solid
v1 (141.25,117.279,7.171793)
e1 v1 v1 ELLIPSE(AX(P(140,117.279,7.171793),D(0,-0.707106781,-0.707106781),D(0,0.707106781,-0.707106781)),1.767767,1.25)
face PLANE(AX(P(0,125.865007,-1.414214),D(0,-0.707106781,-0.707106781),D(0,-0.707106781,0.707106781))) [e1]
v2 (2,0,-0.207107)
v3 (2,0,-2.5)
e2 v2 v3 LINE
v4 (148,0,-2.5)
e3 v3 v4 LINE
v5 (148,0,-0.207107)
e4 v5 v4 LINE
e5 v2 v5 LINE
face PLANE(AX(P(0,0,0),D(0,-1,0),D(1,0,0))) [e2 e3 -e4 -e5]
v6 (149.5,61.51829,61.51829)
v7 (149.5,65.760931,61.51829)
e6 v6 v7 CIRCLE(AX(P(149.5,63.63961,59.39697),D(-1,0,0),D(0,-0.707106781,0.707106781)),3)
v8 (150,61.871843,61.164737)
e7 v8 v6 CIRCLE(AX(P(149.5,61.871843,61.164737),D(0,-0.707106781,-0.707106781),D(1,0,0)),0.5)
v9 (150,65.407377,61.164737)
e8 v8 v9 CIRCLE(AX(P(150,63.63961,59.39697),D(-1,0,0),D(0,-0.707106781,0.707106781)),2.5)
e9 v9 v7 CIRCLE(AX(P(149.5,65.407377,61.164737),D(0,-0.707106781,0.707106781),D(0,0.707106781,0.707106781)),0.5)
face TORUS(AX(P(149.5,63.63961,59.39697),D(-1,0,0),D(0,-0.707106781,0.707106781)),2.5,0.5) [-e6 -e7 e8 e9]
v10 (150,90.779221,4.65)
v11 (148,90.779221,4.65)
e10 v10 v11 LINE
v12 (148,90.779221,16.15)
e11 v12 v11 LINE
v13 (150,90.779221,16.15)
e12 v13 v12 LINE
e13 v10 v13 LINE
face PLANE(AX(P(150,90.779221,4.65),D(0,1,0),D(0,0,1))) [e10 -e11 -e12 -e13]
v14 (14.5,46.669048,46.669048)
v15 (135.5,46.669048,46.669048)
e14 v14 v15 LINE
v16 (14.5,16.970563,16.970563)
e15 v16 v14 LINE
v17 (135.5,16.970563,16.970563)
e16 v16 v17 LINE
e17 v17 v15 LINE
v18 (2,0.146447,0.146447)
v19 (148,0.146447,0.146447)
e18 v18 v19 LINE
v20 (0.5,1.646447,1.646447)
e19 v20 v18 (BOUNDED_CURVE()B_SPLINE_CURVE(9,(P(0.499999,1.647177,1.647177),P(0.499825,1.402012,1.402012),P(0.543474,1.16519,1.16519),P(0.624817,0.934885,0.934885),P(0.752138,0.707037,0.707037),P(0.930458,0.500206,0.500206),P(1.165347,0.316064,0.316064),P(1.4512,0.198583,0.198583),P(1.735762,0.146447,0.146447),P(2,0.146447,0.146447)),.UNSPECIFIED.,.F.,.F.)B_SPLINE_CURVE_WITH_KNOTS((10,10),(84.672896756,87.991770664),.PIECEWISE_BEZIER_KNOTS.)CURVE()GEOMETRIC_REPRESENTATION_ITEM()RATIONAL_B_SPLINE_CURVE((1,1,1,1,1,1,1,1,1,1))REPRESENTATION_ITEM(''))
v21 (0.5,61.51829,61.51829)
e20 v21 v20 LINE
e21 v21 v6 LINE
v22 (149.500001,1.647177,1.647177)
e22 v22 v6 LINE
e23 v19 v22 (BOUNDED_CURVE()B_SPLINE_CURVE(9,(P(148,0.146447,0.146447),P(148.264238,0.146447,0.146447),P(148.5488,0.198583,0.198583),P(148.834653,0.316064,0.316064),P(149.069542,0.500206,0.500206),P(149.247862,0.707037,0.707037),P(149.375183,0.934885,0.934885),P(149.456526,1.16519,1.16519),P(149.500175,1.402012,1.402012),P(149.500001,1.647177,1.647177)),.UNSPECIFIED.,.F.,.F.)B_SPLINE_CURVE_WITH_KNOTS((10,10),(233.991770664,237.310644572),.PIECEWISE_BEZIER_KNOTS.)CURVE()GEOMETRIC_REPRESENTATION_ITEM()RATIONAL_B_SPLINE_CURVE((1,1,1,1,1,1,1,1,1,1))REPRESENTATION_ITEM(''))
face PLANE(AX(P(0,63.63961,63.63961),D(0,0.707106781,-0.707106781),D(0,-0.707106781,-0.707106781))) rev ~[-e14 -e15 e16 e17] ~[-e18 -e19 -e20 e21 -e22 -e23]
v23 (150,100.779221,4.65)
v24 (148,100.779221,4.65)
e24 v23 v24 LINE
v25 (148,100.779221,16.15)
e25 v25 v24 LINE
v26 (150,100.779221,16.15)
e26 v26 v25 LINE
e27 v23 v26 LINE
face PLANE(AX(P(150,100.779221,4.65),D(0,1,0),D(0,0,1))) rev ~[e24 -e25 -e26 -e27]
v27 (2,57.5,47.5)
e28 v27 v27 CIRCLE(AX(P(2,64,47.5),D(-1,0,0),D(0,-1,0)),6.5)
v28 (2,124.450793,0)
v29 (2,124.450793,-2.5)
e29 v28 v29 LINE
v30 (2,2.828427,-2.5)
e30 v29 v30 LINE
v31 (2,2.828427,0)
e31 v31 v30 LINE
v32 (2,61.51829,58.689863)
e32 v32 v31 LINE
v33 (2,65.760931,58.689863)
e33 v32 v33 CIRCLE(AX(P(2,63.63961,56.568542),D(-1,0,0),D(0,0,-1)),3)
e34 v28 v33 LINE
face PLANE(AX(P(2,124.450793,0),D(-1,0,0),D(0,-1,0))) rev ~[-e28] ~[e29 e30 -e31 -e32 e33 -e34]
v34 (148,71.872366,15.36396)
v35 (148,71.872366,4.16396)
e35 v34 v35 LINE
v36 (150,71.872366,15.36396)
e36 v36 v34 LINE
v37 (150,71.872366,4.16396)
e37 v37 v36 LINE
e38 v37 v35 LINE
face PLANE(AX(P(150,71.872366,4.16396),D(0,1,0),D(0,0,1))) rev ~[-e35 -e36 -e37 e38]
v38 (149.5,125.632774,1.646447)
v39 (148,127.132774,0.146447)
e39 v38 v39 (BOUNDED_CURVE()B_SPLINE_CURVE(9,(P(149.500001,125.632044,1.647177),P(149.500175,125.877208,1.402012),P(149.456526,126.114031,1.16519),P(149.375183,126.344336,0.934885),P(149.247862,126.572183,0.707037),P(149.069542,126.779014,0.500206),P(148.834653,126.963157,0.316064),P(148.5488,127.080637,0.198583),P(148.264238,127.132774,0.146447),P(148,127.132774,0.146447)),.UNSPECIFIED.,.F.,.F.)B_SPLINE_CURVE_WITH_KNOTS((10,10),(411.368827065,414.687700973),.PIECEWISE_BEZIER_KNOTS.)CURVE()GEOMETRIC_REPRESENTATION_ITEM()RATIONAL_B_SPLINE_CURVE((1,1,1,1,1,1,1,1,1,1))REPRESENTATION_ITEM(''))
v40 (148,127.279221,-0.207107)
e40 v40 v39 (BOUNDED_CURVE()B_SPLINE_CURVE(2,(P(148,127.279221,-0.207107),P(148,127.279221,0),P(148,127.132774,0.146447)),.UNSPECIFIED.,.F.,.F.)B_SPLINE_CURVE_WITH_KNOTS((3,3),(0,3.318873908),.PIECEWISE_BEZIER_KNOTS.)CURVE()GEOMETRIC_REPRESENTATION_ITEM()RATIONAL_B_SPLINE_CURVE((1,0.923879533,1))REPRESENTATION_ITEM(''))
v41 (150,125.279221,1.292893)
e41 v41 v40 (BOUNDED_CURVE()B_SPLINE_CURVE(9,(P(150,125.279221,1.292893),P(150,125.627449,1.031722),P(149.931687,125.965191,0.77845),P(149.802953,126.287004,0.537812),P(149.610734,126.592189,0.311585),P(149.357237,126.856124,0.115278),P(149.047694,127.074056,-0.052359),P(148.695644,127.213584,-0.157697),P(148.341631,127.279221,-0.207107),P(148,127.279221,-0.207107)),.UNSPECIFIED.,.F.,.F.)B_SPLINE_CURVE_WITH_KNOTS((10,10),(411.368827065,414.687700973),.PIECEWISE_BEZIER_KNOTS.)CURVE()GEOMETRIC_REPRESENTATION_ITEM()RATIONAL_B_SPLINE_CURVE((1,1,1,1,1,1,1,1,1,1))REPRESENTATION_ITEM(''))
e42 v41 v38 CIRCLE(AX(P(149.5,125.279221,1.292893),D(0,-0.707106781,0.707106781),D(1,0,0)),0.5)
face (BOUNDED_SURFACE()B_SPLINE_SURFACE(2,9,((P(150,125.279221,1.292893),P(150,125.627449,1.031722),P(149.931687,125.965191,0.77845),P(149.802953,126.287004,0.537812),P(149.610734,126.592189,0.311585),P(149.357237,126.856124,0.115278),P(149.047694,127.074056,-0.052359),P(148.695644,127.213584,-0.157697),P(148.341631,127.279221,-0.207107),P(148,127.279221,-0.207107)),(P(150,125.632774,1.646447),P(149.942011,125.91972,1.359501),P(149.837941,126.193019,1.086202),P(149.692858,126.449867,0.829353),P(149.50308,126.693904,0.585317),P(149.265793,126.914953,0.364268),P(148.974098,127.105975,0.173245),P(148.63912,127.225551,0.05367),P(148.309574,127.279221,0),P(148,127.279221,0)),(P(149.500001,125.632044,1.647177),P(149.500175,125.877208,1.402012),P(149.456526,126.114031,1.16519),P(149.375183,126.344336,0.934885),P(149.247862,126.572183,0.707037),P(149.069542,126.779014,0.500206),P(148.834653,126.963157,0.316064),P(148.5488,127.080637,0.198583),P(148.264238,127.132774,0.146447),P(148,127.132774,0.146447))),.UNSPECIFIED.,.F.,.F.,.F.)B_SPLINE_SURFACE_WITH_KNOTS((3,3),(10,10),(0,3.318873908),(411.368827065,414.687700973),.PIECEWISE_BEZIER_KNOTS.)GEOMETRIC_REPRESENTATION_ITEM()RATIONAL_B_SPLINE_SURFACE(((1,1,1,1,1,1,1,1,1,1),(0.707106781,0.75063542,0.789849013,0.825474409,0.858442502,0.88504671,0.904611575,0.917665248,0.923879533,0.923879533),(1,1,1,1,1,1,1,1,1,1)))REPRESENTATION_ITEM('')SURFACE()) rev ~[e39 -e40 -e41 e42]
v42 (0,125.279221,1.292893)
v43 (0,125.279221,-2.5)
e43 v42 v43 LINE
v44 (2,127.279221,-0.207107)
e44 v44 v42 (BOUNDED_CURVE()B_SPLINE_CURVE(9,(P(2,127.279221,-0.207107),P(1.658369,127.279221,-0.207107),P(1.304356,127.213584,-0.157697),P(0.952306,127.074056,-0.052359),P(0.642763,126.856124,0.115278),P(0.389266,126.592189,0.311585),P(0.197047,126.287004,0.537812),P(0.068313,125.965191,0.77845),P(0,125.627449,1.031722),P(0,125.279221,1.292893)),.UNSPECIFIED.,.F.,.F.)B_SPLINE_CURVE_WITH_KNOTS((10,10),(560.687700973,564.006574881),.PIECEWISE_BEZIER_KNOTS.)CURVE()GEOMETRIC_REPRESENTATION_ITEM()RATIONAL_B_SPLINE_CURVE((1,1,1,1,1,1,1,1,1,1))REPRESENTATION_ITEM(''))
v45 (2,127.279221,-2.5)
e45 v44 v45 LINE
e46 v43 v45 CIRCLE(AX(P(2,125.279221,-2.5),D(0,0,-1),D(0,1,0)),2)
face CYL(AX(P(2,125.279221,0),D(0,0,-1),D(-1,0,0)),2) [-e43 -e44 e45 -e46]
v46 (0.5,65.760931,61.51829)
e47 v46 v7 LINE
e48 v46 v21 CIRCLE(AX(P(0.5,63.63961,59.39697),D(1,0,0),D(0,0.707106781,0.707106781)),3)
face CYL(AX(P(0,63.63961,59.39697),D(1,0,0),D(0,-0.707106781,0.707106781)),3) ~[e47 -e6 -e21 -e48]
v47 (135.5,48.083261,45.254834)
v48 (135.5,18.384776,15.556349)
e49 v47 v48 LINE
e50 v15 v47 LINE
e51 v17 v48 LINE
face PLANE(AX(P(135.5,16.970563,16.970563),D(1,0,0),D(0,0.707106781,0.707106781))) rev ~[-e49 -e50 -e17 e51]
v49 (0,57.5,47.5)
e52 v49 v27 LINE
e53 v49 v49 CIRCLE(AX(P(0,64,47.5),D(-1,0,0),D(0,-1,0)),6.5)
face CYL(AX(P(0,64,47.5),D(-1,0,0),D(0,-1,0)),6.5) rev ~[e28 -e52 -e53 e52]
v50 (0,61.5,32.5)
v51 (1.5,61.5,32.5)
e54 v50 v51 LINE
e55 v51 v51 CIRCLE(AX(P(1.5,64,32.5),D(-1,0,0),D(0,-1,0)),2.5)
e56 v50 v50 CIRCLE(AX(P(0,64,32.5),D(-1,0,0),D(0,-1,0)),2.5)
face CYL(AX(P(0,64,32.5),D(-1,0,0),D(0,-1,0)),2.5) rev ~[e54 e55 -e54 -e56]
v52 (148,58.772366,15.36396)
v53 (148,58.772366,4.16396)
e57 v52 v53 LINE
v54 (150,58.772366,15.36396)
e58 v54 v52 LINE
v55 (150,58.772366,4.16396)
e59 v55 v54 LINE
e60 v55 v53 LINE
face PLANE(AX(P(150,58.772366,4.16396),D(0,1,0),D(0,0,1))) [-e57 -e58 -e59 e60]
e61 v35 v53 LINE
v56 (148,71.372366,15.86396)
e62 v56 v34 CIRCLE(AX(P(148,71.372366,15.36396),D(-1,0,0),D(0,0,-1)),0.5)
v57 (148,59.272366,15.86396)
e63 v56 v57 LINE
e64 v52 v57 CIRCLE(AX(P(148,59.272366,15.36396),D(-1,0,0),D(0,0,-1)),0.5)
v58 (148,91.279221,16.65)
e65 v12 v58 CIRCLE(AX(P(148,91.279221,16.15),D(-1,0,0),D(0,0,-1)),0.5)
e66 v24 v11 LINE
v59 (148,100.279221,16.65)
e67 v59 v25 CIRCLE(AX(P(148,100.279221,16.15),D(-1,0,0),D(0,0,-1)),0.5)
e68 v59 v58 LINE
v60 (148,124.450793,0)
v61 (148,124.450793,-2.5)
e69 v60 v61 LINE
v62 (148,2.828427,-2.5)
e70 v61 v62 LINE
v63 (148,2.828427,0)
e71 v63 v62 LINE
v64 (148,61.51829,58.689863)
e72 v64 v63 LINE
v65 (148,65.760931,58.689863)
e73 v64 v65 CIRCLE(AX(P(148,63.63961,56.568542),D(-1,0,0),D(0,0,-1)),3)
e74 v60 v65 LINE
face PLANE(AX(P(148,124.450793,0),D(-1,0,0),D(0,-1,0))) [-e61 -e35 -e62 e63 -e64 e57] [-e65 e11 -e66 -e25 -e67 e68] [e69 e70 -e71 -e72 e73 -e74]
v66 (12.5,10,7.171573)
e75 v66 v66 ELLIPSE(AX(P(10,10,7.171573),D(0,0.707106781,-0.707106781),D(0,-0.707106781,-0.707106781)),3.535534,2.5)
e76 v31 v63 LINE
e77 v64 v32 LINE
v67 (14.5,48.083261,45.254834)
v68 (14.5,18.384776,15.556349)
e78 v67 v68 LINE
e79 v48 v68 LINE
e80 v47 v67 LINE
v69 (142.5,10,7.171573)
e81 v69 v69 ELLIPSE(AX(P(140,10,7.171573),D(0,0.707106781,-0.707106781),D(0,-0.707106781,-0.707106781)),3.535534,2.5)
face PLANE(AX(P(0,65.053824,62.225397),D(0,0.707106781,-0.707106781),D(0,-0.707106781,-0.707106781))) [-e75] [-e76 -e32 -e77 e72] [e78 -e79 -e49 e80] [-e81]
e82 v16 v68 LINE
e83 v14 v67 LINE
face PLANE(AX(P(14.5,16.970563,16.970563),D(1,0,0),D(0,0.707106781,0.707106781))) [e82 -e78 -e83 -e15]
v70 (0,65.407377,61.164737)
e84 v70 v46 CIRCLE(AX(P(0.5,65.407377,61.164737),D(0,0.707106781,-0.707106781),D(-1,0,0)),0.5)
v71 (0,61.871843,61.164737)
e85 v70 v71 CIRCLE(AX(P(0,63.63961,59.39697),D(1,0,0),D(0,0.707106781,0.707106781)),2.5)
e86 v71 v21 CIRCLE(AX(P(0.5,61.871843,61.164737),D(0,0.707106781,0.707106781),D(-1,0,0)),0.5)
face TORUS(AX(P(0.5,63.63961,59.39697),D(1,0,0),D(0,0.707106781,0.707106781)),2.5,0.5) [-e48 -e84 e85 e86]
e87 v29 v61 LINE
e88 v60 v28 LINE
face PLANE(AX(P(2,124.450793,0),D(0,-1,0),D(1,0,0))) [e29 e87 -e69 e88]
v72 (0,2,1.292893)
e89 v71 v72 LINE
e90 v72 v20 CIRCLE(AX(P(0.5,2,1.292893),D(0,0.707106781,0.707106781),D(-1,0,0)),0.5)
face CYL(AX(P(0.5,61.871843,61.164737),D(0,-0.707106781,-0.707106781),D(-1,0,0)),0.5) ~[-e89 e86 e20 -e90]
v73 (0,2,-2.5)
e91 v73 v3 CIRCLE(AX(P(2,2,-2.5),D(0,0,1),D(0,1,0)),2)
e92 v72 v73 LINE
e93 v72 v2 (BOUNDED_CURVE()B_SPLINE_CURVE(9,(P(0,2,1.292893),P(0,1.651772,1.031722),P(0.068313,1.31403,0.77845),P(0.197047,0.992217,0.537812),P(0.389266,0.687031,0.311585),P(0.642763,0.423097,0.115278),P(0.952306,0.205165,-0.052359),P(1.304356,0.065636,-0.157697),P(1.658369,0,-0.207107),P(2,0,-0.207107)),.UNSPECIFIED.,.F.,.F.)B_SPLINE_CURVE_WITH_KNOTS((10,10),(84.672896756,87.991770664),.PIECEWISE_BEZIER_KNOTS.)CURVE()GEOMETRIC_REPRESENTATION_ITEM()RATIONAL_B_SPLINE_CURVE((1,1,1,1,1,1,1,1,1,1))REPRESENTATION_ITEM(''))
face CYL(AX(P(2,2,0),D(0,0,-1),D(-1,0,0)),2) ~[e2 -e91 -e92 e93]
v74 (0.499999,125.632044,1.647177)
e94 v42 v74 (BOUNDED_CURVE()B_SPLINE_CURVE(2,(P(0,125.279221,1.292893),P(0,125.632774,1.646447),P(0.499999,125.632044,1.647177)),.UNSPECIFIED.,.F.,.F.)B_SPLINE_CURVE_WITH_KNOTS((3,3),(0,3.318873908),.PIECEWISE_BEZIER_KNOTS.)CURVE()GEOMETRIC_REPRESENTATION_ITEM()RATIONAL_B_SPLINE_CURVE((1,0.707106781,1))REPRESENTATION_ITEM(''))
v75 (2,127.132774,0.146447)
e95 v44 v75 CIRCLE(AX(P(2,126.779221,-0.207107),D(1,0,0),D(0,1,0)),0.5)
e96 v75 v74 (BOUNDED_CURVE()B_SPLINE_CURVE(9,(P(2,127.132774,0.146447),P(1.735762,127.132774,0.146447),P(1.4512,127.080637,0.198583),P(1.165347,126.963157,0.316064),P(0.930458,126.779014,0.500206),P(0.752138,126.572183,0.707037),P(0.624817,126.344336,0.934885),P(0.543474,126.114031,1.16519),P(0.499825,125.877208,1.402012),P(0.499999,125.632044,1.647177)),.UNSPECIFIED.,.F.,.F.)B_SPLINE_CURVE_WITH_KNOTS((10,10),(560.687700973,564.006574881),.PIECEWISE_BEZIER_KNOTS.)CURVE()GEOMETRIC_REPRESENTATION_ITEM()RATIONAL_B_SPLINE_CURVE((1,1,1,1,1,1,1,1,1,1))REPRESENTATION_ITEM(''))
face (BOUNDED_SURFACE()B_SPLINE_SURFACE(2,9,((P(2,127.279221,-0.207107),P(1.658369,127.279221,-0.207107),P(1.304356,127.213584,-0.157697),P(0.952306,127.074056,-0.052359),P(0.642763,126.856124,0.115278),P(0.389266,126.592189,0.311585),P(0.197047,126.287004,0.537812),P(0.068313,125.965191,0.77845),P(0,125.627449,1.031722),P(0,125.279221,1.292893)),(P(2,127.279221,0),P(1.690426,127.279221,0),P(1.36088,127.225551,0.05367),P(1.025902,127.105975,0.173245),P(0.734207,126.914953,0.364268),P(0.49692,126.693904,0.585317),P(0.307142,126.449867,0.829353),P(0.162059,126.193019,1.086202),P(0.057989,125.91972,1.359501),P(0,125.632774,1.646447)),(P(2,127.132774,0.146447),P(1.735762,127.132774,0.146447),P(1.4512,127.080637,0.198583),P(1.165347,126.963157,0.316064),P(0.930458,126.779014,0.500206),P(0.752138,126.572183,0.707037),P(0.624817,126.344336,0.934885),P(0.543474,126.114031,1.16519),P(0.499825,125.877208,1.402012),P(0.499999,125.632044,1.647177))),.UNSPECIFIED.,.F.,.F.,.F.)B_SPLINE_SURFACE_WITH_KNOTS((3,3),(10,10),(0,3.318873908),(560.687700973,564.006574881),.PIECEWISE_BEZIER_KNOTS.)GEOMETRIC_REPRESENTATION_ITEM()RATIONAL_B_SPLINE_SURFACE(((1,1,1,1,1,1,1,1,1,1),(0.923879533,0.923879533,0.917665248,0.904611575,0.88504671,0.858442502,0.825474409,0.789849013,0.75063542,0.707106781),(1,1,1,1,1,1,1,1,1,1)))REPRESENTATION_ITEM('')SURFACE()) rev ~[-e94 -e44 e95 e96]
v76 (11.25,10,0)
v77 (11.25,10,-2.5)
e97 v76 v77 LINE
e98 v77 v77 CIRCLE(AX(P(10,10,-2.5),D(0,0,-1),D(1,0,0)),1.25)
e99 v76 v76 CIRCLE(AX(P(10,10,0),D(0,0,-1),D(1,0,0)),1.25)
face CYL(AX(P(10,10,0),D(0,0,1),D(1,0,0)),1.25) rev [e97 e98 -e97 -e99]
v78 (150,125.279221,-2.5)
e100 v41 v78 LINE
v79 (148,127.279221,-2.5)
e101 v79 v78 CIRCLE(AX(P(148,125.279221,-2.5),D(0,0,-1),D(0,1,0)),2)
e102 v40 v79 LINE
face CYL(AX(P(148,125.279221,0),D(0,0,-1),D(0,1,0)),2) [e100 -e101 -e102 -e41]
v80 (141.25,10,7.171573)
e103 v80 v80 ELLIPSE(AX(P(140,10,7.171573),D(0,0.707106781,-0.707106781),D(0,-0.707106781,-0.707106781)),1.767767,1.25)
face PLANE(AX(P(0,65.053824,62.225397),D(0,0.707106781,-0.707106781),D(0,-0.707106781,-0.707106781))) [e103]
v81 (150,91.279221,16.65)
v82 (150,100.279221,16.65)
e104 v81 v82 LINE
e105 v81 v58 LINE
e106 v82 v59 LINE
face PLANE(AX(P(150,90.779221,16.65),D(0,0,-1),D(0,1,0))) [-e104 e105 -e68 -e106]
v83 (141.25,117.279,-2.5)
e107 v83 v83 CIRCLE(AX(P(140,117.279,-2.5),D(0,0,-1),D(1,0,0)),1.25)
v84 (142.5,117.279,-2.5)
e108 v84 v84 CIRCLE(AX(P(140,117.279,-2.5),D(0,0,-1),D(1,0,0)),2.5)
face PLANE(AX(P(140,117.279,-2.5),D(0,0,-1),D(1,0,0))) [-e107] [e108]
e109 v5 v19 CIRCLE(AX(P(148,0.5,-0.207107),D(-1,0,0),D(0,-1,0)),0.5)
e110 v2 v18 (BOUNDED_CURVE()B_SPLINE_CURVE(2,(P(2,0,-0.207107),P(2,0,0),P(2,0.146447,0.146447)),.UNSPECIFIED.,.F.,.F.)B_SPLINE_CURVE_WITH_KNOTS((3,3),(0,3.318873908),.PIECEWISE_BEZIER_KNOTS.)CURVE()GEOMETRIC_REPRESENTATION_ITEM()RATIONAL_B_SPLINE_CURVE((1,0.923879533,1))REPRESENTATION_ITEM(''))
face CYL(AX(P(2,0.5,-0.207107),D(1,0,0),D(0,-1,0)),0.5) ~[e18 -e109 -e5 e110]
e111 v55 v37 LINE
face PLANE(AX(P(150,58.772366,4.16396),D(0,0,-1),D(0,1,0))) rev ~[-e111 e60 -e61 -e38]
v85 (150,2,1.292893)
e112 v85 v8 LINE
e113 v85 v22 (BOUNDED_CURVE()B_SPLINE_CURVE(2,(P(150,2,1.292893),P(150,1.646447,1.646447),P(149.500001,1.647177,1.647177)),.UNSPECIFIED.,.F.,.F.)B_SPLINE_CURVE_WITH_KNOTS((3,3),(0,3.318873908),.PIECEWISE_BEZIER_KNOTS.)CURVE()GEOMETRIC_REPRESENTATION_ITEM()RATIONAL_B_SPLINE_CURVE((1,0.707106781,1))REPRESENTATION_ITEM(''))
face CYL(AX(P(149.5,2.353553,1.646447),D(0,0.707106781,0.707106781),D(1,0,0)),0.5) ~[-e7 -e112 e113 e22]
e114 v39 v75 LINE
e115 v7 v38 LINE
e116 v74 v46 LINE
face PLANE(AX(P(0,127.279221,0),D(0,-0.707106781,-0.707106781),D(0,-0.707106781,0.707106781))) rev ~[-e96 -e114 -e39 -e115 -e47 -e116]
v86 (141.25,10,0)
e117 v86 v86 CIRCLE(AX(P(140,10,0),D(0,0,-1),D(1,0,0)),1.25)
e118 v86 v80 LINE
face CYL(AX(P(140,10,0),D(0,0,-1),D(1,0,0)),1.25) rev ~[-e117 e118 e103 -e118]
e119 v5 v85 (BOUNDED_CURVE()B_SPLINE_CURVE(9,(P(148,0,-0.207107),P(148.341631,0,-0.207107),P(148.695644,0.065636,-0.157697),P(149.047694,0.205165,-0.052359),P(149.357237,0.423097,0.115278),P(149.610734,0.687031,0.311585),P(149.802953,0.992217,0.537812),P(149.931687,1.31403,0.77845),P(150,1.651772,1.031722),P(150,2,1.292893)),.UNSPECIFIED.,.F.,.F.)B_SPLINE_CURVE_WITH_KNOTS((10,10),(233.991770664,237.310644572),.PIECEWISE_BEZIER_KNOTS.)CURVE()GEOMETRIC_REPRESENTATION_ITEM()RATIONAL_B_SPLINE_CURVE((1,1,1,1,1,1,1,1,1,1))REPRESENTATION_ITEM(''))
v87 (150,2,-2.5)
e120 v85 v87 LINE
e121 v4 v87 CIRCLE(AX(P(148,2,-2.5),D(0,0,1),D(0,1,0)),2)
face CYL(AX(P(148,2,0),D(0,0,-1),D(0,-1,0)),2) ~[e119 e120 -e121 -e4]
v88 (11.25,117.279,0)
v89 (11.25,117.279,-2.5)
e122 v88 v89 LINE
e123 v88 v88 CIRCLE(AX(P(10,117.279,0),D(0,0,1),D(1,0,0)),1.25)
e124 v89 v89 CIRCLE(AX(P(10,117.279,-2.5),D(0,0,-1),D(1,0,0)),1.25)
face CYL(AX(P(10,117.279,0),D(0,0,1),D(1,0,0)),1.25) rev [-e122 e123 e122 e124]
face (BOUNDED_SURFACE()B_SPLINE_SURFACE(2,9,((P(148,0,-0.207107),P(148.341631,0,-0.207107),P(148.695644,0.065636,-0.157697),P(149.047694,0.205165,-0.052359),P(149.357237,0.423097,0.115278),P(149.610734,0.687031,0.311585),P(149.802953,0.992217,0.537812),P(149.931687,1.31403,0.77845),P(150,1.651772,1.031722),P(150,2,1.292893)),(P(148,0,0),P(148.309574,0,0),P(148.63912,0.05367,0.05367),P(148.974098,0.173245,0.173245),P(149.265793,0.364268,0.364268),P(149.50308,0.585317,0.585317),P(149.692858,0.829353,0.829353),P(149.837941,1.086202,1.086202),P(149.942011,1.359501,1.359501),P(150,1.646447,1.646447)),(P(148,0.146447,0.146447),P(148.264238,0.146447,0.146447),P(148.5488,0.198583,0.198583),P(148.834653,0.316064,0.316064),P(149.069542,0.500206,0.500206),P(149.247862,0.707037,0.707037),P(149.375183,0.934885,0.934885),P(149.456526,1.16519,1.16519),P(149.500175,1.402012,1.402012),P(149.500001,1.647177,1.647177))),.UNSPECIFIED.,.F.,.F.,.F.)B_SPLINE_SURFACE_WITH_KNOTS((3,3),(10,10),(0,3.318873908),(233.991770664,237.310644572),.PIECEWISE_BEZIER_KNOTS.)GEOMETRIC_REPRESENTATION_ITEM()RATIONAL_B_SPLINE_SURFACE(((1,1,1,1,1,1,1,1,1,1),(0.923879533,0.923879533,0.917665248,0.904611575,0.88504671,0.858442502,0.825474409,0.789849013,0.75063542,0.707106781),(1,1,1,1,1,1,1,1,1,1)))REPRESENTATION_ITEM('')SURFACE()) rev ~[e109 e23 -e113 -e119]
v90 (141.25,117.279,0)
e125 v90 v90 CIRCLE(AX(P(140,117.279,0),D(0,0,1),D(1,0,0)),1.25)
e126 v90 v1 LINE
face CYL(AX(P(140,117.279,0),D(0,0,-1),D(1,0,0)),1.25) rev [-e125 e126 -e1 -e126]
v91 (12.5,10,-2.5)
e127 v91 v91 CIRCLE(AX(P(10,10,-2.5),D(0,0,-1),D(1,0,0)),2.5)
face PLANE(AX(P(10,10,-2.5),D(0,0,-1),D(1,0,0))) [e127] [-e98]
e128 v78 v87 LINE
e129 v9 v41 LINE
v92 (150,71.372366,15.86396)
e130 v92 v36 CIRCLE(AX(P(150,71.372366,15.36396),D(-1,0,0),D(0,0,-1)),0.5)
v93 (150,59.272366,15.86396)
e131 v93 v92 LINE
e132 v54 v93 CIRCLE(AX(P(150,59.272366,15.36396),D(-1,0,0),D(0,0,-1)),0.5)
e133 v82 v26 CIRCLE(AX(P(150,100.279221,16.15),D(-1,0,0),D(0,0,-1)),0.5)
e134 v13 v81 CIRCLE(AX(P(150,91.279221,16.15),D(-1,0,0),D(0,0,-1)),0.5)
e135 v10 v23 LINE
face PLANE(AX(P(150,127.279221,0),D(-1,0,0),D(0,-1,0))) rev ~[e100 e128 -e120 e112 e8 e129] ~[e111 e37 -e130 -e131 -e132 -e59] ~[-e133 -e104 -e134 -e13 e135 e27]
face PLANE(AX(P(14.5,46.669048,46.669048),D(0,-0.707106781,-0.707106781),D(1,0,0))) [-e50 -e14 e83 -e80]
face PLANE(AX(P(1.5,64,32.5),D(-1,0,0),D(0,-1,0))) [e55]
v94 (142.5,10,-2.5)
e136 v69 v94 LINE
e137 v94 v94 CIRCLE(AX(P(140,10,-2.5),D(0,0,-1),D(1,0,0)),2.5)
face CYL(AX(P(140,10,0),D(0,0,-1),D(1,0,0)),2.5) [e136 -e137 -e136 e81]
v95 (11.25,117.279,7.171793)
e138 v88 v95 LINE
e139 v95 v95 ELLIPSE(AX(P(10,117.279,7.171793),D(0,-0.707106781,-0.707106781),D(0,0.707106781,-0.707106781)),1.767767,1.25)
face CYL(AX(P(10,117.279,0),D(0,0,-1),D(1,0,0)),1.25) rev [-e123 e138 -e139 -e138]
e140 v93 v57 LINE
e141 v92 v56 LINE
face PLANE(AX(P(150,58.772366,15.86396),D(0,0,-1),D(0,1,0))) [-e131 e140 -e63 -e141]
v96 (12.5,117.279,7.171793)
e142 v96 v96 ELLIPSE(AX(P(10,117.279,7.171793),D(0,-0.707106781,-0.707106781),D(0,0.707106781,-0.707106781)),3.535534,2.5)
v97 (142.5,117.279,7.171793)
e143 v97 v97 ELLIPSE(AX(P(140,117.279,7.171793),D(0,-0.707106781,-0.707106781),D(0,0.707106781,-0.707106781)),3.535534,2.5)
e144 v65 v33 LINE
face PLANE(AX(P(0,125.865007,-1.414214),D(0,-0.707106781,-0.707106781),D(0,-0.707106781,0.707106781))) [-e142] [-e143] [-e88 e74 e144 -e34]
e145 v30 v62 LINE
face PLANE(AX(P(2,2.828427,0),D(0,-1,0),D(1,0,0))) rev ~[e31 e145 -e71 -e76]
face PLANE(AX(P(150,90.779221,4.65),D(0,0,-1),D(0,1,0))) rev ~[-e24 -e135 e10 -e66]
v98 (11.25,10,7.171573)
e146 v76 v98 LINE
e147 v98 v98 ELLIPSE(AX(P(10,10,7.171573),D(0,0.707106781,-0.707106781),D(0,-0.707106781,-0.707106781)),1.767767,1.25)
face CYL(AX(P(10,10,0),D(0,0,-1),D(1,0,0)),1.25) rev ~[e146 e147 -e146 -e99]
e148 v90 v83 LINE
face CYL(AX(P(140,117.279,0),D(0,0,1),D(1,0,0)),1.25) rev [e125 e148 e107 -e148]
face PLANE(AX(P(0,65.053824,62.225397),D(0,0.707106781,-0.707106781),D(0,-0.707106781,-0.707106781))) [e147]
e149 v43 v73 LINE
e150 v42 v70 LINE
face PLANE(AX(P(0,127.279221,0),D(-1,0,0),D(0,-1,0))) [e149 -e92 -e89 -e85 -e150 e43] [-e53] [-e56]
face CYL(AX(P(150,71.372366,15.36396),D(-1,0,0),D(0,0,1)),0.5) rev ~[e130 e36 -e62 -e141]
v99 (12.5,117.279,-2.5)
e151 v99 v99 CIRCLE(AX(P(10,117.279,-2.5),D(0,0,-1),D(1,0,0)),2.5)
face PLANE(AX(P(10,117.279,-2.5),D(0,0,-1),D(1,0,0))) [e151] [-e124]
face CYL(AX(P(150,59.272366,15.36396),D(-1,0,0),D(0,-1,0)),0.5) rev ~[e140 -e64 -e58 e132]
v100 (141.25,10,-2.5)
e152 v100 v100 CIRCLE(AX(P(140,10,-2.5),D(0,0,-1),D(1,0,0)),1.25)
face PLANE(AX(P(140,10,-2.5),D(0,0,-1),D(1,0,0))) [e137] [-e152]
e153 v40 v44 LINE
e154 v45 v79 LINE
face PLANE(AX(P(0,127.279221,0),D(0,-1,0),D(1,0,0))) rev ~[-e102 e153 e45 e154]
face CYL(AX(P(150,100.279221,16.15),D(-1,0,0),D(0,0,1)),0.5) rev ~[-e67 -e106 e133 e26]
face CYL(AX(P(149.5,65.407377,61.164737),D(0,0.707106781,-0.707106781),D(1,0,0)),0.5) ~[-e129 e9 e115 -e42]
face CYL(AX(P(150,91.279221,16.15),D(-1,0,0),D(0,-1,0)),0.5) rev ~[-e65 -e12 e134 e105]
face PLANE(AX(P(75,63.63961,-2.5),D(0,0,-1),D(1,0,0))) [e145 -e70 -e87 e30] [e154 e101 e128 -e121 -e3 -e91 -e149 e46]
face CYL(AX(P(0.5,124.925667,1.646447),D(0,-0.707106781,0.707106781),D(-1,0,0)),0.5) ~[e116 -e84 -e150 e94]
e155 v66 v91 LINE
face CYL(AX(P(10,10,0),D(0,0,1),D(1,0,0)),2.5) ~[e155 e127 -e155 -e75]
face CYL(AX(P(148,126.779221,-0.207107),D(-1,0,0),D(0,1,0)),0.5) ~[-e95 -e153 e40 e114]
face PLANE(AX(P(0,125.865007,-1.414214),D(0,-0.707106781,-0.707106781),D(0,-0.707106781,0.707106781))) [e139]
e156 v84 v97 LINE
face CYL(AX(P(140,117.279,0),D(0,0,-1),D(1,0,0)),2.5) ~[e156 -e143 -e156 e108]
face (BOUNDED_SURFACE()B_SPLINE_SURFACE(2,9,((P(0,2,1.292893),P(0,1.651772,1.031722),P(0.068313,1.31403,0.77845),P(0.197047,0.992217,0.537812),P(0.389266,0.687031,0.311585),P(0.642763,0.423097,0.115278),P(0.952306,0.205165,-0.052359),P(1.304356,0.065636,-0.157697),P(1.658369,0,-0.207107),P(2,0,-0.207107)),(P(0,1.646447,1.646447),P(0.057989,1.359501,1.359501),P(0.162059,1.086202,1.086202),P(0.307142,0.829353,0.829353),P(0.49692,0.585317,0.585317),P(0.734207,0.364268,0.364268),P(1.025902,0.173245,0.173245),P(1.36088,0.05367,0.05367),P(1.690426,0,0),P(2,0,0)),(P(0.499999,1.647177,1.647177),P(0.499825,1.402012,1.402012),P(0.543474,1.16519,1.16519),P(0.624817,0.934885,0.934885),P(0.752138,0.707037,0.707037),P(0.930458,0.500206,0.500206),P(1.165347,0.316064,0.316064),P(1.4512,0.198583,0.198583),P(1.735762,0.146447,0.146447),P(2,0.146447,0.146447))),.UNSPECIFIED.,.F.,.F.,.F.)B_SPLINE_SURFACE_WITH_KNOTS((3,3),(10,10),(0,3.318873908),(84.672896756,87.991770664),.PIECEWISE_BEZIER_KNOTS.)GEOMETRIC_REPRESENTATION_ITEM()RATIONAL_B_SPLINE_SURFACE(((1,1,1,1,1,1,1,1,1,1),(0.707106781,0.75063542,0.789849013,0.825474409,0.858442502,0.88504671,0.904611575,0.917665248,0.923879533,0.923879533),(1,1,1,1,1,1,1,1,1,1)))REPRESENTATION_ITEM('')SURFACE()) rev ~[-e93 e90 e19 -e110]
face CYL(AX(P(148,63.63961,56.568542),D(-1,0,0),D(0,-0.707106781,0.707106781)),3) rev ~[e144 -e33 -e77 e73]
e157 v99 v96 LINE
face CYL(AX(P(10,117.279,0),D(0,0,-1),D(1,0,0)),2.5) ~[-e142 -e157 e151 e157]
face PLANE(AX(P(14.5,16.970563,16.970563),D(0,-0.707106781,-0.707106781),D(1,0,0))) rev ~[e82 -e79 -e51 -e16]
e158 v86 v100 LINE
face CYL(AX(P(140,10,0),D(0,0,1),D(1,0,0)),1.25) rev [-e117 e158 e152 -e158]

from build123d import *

# Parameters (mm, degrees)
F1_DEPTH  = 150
F2_T      = -2
F4_W      = 121
F4_H      = 42
F5_DEPTH  = 3
F6_R      = 3
F8_R      = 2.5
F8_R_2    = 1.5
F10_R     = 2.5
F10_R_2   = 1.25
F11_REACH = 69.4690374315
F12_W     = 150
F12_H     = 127.2792206136
F12_W_2   = 146
F12_H_2   = 121.6223663641
F13_DEPTH = 2.5
F14_R     = 2.5
F14_R_2   = 1.25
F16_R     = 2
F17_R     = 0.5
F7_W      = 10
F7_H      = 12
F7_W_2    = 13.1
F7_H_2    = 11.7
F18_DEPTH = 3
F19_R     = 0.5
F20_R     = 0.5
F21_R     = 6.5
F22_DEPTH = 2.5
F23_R     = 2.5
F23_R_2   = 1.25
F24_DEPTH = 2.5
F25_R     = 2.5
F26_DEPTH = 1.5
F27_R     = 3


with BuildPart() as f1:
    # F0 (on Right) → F1 (new body)
    with BuildSketch(Plane.YZ):
        Polygon((63.6396103068, 63.6396103068), (0, 0), (127.2792206136, 0), align=None)
    extrude(amount=F1_DEPTH)

    # F2
    f2_openings = [f1.faces().sort_by_distance(p)[0] for p in [
        (75, 63.63961, 0),
    ]]
    offset(amount=F2_T, openings=f2_openings)

    # F4 (on offset) → F5 (cut)
    with BuildSketch(Plane(origin=(0, 0, 0), x_dir=(1, 0, 0), z_dir=(0, -0.7071067812, 0.7071067812))):
        with Locations((75, 45)):
            Rectangle(F4_W, F4_H)
    extrude(amount=-F5_DEPTH, mode=Mode.SUBTRACT)

    # F6
    f6_edges = [f1.edges().sort_by_distance(p)[0] for p in [
        (75, 63.63961, 63.63961),
    ]]
    fillet(f6_edges, radius=F6_R)

    # F8 (on face) → F9 (join, up to the last surface of F1)
    with BuildSketch(Plane(origin=(0, 0, 0), x_dir=(1, 0, 0), z_dir=(0, 0, -1))):
        with Locations((10, -10)):
            Circle(F8_R)
        with Locations((10, -10)):
            Circle(F8_R_2, mode=Mode.SUBTRACT)
    extrude(until=Until.LAST, dir=(0, 0, 1))

    f11_end = Plane(origin=(75.2423938978, 33.320661552, 30.4922344273), x_dir=(0, 0.7071067812, 0.7071067812), z_dir=(0, 0.7071067812, -0.7071067812))
    # F10 (on face) → F11 (join, up to a plane its end follows)
    with BuildSketch(Plane(origin=(0, 0, 0), x_dir=(1, 0, 0), z_dir=(0, 0, -1))):
        with Locations((10, -10)):
            Circle(F10_R)
        with Locations((10, -10)):
            Circle(F10_R_2, mode=Mode.SUBTRACT)
        with Locations((140, -10)):
            Circle(F10_R)
        with Locations((140, -10)):
            Circle(F10_R_2, mode=Mode.SUBTRACT)
    f11_long = extrude(amount=-F11_REACH, mode=Mode.PRIVATE)
    add(split(f11_long, bisect_by=f11_end, keep=Keep.TOP, mode=Mode.PRIVATE))

    # F12 (on face) → F13 (join)
    with BuildSketch(Plane(origin=(0, 0, 0), x_dir=(1, 0, 0), z_dir=(0, 0, -1))):
        with Locations((75, -63.6396103068)):
            Rectangle(F12_W, F12_H)
        with Locations((75, -63.6396103068)):
            Rectangle(F12_W_2, F12_H_2, mode=Mode.SUBTRACT)
    extrude(amount=F13_DEPTH)

    # F14 (on Top) → F15 (join, up to the next surface of F1)
    with BuildSketch(Plane.XY):
        with Locations((140, 117.279)):
            Circle(F14_R)
        with Locations((140, 117.279)):
            Circle(F14_R_2, mode=Mode.SUBTRACT)
        with Locations((10, 117.279)):
            Circle(F14_R)
        with Locations((10, 117.279)):
            Circle(F14_R_2, mode=Mode.SUBTRACT)
    extrude(until=Until.NEXT)

    # F16
    f16_edges = [f1.edges().sort_by_distance(p)[0] for p in [
        (150, 127.279221, -1.25),
        (150, 0, -1.25),
        (0, 0, -1.25),
        (0, 127.279221, -1.25),
    ]]
    fillet(f16_edges, radius=F16_R)

    # F17
    f17_edges = [f1.edges().sort_by_distance(p)[0] for p in [
        (0, 31.759145, 31.759145),
    ]]
    fillet(f17_edges, radius=F17_R)

    # F7 (on face) → F18 (cut)
    with BuildSketch(Plane.YZ.offset(150)):
        with Locations((95.7792206136, 10.65)):
            Rectangle(F7_W, F7_H)
        with Locations((65.3223664939, 10.0139604606)):
            Rectangle(F7_W_2, F7_H_2)
    extrude(amount=-F18_DEPTH, mode=Mode.SUBTRACT)

    # F19
    f19_edges = [f1.edges().sort_by_distance(p)[0] for p in [
        (149, 90.779221, 16.65),
        (149, 100.779221, 16.65),
    ]]
    fillet(f19_edges, radius=F19_R)

    # F20
    f20_edges = [f1.edges().sort_by_distance(p)[0] for p in [
        (149, 71.872366, 15.86396),
        (149, 58.772366, 15.86396),
    ]]
    fillet(f20_edges, radius=F20_R)

    # F21 (on face) → F22 (cut)
    with BuildSketch(Plane(origin=(0, 0, 0), x_dir=(0, -1, 0), z_dir=(-1, 0, 0))):
        with Locations((-64, 47.5)):
            Circle(F21_R)
    extrude(amount=-F22_DEPTH, mode=Mode.SUBTRACT)

    # F23 (on face) → F24 (join)
    with BuildSketch(Plane(origin=(0, 0, 0), x_dir=(1, 0, 0), z_dir=(0, 0, -1))):
        with Locations((10, -10)):
            Circle(F23_R)
        with Locations((10, -10)):
            Circle(F23_R_2, mode=Mode.SUBTRACT)
        with Locations((140, -10)):
            Circle(F23_R)
        with Locations((140, -10)):
            Circle(F23_R_2, mode=Mode.SUBTRACT)
        with Locations((10, -117.279)):
            Circle(F23_R)
        with Locations((10, -117.279)):
            Circle(F23_R_2, mode=Mode.SUBTRACT)
        with Locations((140, -117.279)):
            Circle(F23_R)
        with Locations((140, -117.279)):
            Circle(F23_R_2, mode=Mode.SUBTRACT)
    extrude(amount=F24_DEPTH)

    # F25 (on face) → F26 (cut)
    with BuildSketch(Plane(origin=(0, 0, 0), x_dir=(0, -1, 0), z_dir=(-1, 0, 0))):
        with Locations((-64, 32.5)):
            Circle(F25_R)
    extrude(amount=-F26_DEPTH, mode=Mode.SUBTRACT)

    # F27
    f27_edges = [f1.edges().sort_by_distance(p)[0] for p in [
        (75, 63.63961, 60.811183),
    ]]
    fillet(f27_edges, radius=F27_R)


solid = f1.part
